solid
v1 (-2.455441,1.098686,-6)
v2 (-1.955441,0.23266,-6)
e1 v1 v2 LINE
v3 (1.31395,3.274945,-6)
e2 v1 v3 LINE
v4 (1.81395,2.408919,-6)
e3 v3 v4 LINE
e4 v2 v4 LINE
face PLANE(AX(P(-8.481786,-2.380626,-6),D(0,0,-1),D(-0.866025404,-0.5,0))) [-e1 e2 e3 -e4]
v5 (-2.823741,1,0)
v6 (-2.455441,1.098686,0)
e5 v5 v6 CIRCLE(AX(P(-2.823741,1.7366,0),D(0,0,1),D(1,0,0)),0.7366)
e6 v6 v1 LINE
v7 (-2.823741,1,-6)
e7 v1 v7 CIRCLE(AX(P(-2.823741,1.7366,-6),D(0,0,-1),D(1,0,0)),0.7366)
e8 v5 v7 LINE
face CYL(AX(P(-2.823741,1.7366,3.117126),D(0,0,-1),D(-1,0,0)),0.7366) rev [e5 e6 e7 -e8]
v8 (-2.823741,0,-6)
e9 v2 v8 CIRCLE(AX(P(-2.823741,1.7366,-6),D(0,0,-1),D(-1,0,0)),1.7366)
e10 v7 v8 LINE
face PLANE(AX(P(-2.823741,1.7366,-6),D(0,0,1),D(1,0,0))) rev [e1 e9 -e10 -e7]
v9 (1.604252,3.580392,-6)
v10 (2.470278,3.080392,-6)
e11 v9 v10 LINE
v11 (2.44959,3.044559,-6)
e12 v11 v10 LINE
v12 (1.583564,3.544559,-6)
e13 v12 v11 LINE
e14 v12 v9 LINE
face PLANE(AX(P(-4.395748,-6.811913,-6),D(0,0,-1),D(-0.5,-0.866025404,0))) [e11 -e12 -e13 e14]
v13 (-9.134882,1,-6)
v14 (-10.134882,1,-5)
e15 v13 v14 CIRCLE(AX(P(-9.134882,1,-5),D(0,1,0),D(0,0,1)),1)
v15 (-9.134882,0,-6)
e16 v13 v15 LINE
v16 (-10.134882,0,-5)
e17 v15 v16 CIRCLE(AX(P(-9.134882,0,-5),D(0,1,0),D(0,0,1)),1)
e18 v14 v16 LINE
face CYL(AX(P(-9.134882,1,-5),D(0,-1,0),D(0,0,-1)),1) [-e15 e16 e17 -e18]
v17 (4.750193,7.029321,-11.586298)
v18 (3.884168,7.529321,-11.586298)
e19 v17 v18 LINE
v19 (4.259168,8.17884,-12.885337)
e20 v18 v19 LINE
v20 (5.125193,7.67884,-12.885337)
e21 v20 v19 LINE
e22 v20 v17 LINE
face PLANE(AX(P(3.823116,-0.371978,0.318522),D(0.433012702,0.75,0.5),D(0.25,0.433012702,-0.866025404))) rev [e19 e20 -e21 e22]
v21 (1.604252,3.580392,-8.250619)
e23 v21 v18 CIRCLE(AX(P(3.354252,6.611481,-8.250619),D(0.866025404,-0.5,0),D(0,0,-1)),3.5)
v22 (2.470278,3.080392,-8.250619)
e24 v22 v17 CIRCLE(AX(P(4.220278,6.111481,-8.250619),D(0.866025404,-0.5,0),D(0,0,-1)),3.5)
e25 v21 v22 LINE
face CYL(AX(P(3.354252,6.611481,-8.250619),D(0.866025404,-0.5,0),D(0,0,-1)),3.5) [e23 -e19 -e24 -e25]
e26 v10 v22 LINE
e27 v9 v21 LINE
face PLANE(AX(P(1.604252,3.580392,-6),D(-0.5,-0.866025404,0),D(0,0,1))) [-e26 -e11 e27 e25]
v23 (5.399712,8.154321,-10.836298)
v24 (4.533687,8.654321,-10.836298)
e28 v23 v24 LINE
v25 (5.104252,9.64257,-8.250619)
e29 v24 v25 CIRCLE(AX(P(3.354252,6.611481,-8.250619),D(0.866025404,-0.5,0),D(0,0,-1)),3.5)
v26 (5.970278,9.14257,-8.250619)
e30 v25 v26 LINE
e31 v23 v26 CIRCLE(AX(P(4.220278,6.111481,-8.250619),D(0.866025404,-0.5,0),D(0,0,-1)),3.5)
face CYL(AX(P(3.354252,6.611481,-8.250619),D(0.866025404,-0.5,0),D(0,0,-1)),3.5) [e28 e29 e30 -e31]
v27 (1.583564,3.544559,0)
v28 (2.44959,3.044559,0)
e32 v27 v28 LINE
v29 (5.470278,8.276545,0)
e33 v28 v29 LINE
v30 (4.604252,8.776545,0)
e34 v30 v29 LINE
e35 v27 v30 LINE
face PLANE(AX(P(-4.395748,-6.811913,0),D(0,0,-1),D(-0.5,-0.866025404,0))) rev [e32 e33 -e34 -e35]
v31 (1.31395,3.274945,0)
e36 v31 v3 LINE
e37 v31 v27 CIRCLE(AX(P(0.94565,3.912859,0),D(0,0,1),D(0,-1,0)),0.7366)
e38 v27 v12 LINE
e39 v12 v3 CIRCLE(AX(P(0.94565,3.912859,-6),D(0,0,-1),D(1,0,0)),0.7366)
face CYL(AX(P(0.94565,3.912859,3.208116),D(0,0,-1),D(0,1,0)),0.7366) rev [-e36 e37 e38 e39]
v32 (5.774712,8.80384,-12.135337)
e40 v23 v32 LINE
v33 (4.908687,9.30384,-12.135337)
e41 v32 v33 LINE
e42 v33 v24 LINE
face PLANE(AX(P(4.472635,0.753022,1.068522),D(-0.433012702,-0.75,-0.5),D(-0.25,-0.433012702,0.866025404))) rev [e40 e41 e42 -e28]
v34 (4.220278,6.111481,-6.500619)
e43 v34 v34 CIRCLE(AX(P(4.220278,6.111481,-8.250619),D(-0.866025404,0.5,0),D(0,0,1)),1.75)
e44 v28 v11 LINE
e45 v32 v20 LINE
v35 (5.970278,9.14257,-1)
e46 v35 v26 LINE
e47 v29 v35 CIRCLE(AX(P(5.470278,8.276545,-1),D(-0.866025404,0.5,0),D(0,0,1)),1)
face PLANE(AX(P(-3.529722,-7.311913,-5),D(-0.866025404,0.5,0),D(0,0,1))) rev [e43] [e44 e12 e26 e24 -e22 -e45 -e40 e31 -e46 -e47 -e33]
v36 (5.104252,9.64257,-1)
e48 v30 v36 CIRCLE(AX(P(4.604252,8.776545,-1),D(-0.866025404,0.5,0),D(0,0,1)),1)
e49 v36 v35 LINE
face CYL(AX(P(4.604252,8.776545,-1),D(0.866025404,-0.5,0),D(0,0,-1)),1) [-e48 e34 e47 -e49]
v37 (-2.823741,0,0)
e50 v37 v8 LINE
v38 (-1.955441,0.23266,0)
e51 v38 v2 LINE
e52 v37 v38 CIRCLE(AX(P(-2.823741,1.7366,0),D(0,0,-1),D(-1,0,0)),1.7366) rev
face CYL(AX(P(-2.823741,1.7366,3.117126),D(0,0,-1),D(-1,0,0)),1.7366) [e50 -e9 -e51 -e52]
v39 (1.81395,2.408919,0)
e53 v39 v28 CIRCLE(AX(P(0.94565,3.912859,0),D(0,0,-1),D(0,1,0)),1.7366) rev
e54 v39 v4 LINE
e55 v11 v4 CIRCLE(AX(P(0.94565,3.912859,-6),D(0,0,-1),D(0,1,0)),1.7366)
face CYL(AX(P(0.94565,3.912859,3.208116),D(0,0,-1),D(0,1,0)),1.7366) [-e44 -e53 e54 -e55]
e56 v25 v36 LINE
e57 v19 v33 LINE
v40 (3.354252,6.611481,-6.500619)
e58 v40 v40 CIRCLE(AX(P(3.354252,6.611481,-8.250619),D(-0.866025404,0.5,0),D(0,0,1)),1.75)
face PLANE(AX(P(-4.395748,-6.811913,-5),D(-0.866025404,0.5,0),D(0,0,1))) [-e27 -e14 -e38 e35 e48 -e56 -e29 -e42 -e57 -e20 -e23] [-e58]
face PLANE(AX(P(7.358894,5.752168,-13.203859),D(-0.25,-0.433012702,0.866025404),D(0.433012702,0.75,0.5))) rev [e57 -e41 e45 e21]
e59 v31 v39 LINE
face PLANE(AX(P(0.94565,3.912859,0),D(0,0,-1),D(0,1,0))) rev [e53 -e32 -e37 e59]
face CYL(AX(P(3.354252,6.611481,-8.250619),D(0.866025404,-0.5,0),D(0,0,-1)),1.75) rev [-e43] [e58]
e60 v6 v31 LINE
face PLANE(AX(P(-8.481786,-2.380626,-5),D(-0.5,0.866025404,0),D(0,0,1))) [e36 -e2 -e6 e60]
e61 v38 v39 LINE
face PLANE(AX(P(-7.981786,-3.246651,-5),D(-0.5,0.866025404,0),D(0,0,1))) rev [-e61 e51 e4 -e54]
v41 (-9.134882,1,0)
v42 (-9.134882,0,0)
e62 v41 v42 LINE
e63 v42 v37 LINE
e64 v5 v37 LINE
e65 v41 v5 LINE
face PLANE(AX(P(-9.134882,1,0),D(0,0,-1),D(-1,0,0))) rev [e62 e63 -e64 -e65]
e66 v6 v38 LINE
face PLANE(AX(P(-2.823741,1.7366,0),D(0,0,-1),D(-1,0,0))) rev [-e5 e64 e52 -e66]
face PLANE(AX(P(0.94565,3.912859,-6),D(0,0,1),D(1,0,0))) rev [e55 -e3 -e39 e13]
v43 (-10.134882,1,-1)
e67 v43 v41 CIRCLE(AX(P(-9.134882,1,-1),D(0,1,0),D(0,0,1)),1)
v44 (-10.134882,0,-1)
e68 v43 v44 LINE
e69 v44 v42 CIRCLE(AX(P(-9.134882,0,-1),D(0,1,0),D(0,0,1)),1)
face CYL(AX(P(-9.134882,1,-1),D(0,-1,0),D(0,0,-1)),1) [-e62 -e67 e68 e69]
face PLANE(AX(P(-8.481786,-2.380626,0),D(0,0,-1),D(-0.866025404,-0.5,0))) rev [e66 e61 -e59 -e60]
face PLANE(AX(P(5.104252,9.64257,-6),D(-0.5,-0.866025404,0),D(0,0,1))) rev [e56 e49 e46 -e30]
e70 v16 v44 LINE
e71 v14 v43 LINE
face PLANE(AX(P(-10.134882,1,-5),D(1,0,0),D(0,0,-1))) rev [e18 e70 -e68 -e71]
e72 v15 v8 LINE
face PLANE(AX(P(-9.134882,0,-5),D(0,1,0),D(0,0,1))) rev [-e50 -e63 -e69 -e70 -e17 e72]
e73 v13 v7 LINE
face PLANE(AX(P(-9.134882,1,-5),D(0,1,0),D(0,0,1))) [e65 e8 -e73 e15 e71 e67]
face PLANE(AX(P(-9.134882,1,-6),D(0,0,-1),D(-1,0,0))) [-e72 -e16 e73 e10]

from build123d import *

# Parameters (mm, degrees)
SKETCH1_R                  = 1.75
BOSS_EXTRUDE1_DEPTH        = 1
BOSS_EXTRUDE2_START        = -1
BOSS_EXTRUDE2_DEPTH        = 1
SKETCHED_START             = 7.177417197
SKETCHED_BEND1_OUTLINE_R   = 1.75
SKETCHED_BEND1_DEPTH       = 1.366025404
SKETCHED_START_2           = -14
SKETCHED_BEND1_2_DEPTH     = 14
SKETCHED_START_3           = -6
SKETCHED_BEND1_3_DEPTH     = 5
SKETCHED_START_4           = -1.253227831
SKETCHED_BEND1_4_DEPTH     = 1.253227831
SKETCHED_START_5           = -6.500618506
SKETCHED_BEND1_5_DEPTH     = 0.500618506
SKETCHED_START_6           = -0.400872669
SKETCHED_BEND1_6_OUTLINE_R = 1.75
SKETCHED_BEND1_6_DEPTH     = 1


with BuildPart() as part:
    # Sketch1 → Boss-Extrude1 (new body)
    with BuildSketch(Plane(origin=(0, 0, 0), x_dir=(1, 0, 0), z_dir=(0, 1, 0))):
        with BuildLine():
            Line((-9.134882229, 6), (2.865117771, 6))
            Line((2.865117771, 6), (2.865117771, 8.250618606))
            ThreePointArc((2.865117771, 8.250618606), (6.365117771, 11.750618606), (9.865117771, 8.250618606))
            Line((9.865117771, 8.250618606), (9.865117771, 6))
            Line((9.865117771, 6), (9.865117771, 1))
            ThreePointArc((9.865117771, 1), (9.572224552, 0.292893219), (8.865117771, 0))
            Line((8.865117771, 0), (-9.134882229, 0))
            ThreePointArc((-9.134882229, 0), (-9.84198901, 0.292893219), (-10.134882229, 1))
            Line((-10.134882229, 1), (-10.134882229, 5))
            ThreePointArc((-10.134882229, 5), (-9.84198901, 5.707106781), (-9.134882229, 6))
        make_face()
        with Locations(Location((6.365117771, 8.250618606, 0), (0, 0, 270))):
            Circle(SKETCH1_R, mode=Mode.SUBTRACT)
    extrude(amount=BOSS_EXTRUDE1_DEPTH)

    # Sketch3 → Boss-Extrude2 (add)
    with BuildSketch(Plane(origin=(0, 1, 0), x_dir=(1, 0, 0), z_dir=(0, 1, 0)).offset(BOSS_EXTRUDE2_START)):
        with BuildLine():
            Line((8.17494801, 12.885336532), (7.42494801, 11.586298426))
            ThreePointArc((7.42494801, 11.586298426), (8.115117771, 11.281707519), (8.723986115, 10.836298426))
            Line((8.723986115, 10.836298426), (9.473986115, 12.135336532))
            Line((9.473986115, 12.135336532), (8.17494801, 12.885336532))
        make_face()
    extrude(amount=BOSS_EXTRUDE2_DEPTH)

    # Sketched Bend1: read off the stored shape, not the designer's step
    # Sketched Bend1 outline → Sketched Bend1 (cut)
    with BuildSketch(Plane(origin=(0, 0, 0), x_dir=(0.49999999999999767, 0.86602540378444, 0), z_dir=(0.8660254037844399, -0.49999999999999795, 0)).offset(SKETCHED_START)):
        with Locations((7.402836748, -8.250618606)):
            Circle(SKETCHED_BEND1_OUTLINE_R)
    extrude(amount=SKETCHED_BEND1_DEPTH, mode=Mode.SUBTRACT)

    # Sketched Bend1 2 outline → Sketched Bend1 2 (cut)
    with BuildSketch(Plane.XY.offset(SKETCHED_START_2)):
        with BuildLine():
            Line((-0.626369748, 1), (-1.955441123, 0.232660284))
            ThreePointArc((-1.955441123, 0.232660284), (-2.374275969, 0.05917321), (-2.823741123, 0))
            Line((-2.823741123, 0), (9.865117771, 0))
            Line((9.865117771, 0), (9.865117771, 1))
            Line((9.865117771, 1), (-0.626369748, 1))
        make_face()
    extrude(amount=SKETCHED_BEND1_2_DEPTH, mode=Mode.SUBTRACT)

    # Sketched Bend1 3 outline → Sketched Bend1 3 (add)
    with BuildSketch(Plane.XY.offset(SKETCHED_START_3)):
        with BuildLine():
            ThreePointArc((1.583564135, 3.544558877), (1.466504678, 3.392004022), (1.313949823, 3.274944565))
            Line((1.313949823, 3.274944565), (-2.455441123, 1.098685688))
            ThreePointArc((-2.455441123, 1.098685688), (-2.633095014, 1.025099036), (-2.823741123, 1))
            Line((-2.823741123, 1), (-0.626369748, 1))
            Line((-0.626369748, 1), (1.813949823, 2.408919161))
            ThreePointArc((1.813949823, 2.408919161), (2.173611459, 2.684897241), (2.449589539, 3.044558877))
            Line((2.449589539, 3.044558877), (5.970277863, 9.142569932))
            Line((5.970277863, 9.142569932), (5.104252459, 9.642569932))
            Line((5.104252459, 9.642569932), (1.583564135, 3.544558877))
        make_face()
    extrude(amount=SKETCHED_BEND1_3_DEPTH)

    # Sketched Bend1 4 outline → Sketched Bend1 4 (add)
    with BuildSketch(Plane.XY.offset(SKETCHED_START_4)):
        with BuildLine():
            ThreePointArc((1.583564135, 3.544558877), (1.466504678, 3.392004022), (1.313949823, 3.274944565))
            Line((1.313949823, 3.274944565), (-2.455441123, 1.098685688))
            ThreePointArc((-2.455441123, 1.098685688), (-2.633095014, 1.025099036), (-2.823741123, 1))
            Line((-2.823741123, 1), (-0.626369748, 1))
            Line((-0.626369748, 1), (1.813949823, 2.408919161))
            ThreePointArc((1.813949823, 2.408919161), (2.173611459, 2.684897241), (2.449589539, 3.044558877))
            Line((2.449589539, 3.044558877), (2.470277863, 3.080392105))
            Line((2.470277863, 3.080392105), (1.604252459, 3.580392105))
            Line((1.604252459, 3.580392105), (1.583564135, 3.544558877))
        make_face()
    extrude(amount=SKETCHED_BEND1_4_DEPTH)

    # Sketched Bend1 5 outline → Sketched Bend1 5 (add)
    with BuildSketch(Plane.XY.offset(SKETCHED_START_5)):
        Polygon((5.104252459, 9.642569932), (1.604252459, 3.580392105), (2.470277863, 3.080392105), (5.970277863, 9.142569932), align=None)
    extrude(amount=SKETCHED_BEND1_5_DEPTH)

    # Sketched Bend1 6 outline → Sketched Bend1 6 (add)
    with BuildSketch(Plane(origin=(0, 0, 0), x_dir=(0.49999999999999767, 0.86602540378444, 0), z_dir=(0.8660254037844399, -0.49999999999999795, 0)).offset(SKETCHED_START_6)):
        with BuildLine():
            Line((3.8614601, 0), (3.8614601, -6))
            Line((3.8614601, -6), (3.902836748, -6))
            Line((3.902836748, -6), (3.902836748, -8.250618606))
            ThreePointArc((3.902836748, -8.250618606), (5.336367033, -11.075455401), (8.462666987, -11.586298426))
            Line((8.462666987, -11.586298426), (9.212666987, -12.885336532))
            Line((9.212666987, -12.885336532), (10.511705093, -12.135336532))
            Line((10.511705093, -12.135336532), (9.761705093, -10.836298426))
            ThreePointArc((9.761705093, -10.836298426), (10.604870415, -9.663764174), (10.902836748, -8.250618606))
            Line((10.902836748, -8.250618606), (10.902836748, -1))
            ThreePointArc((10.902836748, -1), (10.609943529, -0.292893219), (9.902836748, 0))
            Line((9.902836748, 0), (3.8614601, 0))
        make_face()
        with Locations((7.402836748, -8.250618606)):
            Circle(SKETCHED_BEND1_6_OUTLINE_R, mode=Mode.SUBTRACT)
    extrude(amount=SKETCHED_BEND1_6_DEPTH)


solid = part.part
